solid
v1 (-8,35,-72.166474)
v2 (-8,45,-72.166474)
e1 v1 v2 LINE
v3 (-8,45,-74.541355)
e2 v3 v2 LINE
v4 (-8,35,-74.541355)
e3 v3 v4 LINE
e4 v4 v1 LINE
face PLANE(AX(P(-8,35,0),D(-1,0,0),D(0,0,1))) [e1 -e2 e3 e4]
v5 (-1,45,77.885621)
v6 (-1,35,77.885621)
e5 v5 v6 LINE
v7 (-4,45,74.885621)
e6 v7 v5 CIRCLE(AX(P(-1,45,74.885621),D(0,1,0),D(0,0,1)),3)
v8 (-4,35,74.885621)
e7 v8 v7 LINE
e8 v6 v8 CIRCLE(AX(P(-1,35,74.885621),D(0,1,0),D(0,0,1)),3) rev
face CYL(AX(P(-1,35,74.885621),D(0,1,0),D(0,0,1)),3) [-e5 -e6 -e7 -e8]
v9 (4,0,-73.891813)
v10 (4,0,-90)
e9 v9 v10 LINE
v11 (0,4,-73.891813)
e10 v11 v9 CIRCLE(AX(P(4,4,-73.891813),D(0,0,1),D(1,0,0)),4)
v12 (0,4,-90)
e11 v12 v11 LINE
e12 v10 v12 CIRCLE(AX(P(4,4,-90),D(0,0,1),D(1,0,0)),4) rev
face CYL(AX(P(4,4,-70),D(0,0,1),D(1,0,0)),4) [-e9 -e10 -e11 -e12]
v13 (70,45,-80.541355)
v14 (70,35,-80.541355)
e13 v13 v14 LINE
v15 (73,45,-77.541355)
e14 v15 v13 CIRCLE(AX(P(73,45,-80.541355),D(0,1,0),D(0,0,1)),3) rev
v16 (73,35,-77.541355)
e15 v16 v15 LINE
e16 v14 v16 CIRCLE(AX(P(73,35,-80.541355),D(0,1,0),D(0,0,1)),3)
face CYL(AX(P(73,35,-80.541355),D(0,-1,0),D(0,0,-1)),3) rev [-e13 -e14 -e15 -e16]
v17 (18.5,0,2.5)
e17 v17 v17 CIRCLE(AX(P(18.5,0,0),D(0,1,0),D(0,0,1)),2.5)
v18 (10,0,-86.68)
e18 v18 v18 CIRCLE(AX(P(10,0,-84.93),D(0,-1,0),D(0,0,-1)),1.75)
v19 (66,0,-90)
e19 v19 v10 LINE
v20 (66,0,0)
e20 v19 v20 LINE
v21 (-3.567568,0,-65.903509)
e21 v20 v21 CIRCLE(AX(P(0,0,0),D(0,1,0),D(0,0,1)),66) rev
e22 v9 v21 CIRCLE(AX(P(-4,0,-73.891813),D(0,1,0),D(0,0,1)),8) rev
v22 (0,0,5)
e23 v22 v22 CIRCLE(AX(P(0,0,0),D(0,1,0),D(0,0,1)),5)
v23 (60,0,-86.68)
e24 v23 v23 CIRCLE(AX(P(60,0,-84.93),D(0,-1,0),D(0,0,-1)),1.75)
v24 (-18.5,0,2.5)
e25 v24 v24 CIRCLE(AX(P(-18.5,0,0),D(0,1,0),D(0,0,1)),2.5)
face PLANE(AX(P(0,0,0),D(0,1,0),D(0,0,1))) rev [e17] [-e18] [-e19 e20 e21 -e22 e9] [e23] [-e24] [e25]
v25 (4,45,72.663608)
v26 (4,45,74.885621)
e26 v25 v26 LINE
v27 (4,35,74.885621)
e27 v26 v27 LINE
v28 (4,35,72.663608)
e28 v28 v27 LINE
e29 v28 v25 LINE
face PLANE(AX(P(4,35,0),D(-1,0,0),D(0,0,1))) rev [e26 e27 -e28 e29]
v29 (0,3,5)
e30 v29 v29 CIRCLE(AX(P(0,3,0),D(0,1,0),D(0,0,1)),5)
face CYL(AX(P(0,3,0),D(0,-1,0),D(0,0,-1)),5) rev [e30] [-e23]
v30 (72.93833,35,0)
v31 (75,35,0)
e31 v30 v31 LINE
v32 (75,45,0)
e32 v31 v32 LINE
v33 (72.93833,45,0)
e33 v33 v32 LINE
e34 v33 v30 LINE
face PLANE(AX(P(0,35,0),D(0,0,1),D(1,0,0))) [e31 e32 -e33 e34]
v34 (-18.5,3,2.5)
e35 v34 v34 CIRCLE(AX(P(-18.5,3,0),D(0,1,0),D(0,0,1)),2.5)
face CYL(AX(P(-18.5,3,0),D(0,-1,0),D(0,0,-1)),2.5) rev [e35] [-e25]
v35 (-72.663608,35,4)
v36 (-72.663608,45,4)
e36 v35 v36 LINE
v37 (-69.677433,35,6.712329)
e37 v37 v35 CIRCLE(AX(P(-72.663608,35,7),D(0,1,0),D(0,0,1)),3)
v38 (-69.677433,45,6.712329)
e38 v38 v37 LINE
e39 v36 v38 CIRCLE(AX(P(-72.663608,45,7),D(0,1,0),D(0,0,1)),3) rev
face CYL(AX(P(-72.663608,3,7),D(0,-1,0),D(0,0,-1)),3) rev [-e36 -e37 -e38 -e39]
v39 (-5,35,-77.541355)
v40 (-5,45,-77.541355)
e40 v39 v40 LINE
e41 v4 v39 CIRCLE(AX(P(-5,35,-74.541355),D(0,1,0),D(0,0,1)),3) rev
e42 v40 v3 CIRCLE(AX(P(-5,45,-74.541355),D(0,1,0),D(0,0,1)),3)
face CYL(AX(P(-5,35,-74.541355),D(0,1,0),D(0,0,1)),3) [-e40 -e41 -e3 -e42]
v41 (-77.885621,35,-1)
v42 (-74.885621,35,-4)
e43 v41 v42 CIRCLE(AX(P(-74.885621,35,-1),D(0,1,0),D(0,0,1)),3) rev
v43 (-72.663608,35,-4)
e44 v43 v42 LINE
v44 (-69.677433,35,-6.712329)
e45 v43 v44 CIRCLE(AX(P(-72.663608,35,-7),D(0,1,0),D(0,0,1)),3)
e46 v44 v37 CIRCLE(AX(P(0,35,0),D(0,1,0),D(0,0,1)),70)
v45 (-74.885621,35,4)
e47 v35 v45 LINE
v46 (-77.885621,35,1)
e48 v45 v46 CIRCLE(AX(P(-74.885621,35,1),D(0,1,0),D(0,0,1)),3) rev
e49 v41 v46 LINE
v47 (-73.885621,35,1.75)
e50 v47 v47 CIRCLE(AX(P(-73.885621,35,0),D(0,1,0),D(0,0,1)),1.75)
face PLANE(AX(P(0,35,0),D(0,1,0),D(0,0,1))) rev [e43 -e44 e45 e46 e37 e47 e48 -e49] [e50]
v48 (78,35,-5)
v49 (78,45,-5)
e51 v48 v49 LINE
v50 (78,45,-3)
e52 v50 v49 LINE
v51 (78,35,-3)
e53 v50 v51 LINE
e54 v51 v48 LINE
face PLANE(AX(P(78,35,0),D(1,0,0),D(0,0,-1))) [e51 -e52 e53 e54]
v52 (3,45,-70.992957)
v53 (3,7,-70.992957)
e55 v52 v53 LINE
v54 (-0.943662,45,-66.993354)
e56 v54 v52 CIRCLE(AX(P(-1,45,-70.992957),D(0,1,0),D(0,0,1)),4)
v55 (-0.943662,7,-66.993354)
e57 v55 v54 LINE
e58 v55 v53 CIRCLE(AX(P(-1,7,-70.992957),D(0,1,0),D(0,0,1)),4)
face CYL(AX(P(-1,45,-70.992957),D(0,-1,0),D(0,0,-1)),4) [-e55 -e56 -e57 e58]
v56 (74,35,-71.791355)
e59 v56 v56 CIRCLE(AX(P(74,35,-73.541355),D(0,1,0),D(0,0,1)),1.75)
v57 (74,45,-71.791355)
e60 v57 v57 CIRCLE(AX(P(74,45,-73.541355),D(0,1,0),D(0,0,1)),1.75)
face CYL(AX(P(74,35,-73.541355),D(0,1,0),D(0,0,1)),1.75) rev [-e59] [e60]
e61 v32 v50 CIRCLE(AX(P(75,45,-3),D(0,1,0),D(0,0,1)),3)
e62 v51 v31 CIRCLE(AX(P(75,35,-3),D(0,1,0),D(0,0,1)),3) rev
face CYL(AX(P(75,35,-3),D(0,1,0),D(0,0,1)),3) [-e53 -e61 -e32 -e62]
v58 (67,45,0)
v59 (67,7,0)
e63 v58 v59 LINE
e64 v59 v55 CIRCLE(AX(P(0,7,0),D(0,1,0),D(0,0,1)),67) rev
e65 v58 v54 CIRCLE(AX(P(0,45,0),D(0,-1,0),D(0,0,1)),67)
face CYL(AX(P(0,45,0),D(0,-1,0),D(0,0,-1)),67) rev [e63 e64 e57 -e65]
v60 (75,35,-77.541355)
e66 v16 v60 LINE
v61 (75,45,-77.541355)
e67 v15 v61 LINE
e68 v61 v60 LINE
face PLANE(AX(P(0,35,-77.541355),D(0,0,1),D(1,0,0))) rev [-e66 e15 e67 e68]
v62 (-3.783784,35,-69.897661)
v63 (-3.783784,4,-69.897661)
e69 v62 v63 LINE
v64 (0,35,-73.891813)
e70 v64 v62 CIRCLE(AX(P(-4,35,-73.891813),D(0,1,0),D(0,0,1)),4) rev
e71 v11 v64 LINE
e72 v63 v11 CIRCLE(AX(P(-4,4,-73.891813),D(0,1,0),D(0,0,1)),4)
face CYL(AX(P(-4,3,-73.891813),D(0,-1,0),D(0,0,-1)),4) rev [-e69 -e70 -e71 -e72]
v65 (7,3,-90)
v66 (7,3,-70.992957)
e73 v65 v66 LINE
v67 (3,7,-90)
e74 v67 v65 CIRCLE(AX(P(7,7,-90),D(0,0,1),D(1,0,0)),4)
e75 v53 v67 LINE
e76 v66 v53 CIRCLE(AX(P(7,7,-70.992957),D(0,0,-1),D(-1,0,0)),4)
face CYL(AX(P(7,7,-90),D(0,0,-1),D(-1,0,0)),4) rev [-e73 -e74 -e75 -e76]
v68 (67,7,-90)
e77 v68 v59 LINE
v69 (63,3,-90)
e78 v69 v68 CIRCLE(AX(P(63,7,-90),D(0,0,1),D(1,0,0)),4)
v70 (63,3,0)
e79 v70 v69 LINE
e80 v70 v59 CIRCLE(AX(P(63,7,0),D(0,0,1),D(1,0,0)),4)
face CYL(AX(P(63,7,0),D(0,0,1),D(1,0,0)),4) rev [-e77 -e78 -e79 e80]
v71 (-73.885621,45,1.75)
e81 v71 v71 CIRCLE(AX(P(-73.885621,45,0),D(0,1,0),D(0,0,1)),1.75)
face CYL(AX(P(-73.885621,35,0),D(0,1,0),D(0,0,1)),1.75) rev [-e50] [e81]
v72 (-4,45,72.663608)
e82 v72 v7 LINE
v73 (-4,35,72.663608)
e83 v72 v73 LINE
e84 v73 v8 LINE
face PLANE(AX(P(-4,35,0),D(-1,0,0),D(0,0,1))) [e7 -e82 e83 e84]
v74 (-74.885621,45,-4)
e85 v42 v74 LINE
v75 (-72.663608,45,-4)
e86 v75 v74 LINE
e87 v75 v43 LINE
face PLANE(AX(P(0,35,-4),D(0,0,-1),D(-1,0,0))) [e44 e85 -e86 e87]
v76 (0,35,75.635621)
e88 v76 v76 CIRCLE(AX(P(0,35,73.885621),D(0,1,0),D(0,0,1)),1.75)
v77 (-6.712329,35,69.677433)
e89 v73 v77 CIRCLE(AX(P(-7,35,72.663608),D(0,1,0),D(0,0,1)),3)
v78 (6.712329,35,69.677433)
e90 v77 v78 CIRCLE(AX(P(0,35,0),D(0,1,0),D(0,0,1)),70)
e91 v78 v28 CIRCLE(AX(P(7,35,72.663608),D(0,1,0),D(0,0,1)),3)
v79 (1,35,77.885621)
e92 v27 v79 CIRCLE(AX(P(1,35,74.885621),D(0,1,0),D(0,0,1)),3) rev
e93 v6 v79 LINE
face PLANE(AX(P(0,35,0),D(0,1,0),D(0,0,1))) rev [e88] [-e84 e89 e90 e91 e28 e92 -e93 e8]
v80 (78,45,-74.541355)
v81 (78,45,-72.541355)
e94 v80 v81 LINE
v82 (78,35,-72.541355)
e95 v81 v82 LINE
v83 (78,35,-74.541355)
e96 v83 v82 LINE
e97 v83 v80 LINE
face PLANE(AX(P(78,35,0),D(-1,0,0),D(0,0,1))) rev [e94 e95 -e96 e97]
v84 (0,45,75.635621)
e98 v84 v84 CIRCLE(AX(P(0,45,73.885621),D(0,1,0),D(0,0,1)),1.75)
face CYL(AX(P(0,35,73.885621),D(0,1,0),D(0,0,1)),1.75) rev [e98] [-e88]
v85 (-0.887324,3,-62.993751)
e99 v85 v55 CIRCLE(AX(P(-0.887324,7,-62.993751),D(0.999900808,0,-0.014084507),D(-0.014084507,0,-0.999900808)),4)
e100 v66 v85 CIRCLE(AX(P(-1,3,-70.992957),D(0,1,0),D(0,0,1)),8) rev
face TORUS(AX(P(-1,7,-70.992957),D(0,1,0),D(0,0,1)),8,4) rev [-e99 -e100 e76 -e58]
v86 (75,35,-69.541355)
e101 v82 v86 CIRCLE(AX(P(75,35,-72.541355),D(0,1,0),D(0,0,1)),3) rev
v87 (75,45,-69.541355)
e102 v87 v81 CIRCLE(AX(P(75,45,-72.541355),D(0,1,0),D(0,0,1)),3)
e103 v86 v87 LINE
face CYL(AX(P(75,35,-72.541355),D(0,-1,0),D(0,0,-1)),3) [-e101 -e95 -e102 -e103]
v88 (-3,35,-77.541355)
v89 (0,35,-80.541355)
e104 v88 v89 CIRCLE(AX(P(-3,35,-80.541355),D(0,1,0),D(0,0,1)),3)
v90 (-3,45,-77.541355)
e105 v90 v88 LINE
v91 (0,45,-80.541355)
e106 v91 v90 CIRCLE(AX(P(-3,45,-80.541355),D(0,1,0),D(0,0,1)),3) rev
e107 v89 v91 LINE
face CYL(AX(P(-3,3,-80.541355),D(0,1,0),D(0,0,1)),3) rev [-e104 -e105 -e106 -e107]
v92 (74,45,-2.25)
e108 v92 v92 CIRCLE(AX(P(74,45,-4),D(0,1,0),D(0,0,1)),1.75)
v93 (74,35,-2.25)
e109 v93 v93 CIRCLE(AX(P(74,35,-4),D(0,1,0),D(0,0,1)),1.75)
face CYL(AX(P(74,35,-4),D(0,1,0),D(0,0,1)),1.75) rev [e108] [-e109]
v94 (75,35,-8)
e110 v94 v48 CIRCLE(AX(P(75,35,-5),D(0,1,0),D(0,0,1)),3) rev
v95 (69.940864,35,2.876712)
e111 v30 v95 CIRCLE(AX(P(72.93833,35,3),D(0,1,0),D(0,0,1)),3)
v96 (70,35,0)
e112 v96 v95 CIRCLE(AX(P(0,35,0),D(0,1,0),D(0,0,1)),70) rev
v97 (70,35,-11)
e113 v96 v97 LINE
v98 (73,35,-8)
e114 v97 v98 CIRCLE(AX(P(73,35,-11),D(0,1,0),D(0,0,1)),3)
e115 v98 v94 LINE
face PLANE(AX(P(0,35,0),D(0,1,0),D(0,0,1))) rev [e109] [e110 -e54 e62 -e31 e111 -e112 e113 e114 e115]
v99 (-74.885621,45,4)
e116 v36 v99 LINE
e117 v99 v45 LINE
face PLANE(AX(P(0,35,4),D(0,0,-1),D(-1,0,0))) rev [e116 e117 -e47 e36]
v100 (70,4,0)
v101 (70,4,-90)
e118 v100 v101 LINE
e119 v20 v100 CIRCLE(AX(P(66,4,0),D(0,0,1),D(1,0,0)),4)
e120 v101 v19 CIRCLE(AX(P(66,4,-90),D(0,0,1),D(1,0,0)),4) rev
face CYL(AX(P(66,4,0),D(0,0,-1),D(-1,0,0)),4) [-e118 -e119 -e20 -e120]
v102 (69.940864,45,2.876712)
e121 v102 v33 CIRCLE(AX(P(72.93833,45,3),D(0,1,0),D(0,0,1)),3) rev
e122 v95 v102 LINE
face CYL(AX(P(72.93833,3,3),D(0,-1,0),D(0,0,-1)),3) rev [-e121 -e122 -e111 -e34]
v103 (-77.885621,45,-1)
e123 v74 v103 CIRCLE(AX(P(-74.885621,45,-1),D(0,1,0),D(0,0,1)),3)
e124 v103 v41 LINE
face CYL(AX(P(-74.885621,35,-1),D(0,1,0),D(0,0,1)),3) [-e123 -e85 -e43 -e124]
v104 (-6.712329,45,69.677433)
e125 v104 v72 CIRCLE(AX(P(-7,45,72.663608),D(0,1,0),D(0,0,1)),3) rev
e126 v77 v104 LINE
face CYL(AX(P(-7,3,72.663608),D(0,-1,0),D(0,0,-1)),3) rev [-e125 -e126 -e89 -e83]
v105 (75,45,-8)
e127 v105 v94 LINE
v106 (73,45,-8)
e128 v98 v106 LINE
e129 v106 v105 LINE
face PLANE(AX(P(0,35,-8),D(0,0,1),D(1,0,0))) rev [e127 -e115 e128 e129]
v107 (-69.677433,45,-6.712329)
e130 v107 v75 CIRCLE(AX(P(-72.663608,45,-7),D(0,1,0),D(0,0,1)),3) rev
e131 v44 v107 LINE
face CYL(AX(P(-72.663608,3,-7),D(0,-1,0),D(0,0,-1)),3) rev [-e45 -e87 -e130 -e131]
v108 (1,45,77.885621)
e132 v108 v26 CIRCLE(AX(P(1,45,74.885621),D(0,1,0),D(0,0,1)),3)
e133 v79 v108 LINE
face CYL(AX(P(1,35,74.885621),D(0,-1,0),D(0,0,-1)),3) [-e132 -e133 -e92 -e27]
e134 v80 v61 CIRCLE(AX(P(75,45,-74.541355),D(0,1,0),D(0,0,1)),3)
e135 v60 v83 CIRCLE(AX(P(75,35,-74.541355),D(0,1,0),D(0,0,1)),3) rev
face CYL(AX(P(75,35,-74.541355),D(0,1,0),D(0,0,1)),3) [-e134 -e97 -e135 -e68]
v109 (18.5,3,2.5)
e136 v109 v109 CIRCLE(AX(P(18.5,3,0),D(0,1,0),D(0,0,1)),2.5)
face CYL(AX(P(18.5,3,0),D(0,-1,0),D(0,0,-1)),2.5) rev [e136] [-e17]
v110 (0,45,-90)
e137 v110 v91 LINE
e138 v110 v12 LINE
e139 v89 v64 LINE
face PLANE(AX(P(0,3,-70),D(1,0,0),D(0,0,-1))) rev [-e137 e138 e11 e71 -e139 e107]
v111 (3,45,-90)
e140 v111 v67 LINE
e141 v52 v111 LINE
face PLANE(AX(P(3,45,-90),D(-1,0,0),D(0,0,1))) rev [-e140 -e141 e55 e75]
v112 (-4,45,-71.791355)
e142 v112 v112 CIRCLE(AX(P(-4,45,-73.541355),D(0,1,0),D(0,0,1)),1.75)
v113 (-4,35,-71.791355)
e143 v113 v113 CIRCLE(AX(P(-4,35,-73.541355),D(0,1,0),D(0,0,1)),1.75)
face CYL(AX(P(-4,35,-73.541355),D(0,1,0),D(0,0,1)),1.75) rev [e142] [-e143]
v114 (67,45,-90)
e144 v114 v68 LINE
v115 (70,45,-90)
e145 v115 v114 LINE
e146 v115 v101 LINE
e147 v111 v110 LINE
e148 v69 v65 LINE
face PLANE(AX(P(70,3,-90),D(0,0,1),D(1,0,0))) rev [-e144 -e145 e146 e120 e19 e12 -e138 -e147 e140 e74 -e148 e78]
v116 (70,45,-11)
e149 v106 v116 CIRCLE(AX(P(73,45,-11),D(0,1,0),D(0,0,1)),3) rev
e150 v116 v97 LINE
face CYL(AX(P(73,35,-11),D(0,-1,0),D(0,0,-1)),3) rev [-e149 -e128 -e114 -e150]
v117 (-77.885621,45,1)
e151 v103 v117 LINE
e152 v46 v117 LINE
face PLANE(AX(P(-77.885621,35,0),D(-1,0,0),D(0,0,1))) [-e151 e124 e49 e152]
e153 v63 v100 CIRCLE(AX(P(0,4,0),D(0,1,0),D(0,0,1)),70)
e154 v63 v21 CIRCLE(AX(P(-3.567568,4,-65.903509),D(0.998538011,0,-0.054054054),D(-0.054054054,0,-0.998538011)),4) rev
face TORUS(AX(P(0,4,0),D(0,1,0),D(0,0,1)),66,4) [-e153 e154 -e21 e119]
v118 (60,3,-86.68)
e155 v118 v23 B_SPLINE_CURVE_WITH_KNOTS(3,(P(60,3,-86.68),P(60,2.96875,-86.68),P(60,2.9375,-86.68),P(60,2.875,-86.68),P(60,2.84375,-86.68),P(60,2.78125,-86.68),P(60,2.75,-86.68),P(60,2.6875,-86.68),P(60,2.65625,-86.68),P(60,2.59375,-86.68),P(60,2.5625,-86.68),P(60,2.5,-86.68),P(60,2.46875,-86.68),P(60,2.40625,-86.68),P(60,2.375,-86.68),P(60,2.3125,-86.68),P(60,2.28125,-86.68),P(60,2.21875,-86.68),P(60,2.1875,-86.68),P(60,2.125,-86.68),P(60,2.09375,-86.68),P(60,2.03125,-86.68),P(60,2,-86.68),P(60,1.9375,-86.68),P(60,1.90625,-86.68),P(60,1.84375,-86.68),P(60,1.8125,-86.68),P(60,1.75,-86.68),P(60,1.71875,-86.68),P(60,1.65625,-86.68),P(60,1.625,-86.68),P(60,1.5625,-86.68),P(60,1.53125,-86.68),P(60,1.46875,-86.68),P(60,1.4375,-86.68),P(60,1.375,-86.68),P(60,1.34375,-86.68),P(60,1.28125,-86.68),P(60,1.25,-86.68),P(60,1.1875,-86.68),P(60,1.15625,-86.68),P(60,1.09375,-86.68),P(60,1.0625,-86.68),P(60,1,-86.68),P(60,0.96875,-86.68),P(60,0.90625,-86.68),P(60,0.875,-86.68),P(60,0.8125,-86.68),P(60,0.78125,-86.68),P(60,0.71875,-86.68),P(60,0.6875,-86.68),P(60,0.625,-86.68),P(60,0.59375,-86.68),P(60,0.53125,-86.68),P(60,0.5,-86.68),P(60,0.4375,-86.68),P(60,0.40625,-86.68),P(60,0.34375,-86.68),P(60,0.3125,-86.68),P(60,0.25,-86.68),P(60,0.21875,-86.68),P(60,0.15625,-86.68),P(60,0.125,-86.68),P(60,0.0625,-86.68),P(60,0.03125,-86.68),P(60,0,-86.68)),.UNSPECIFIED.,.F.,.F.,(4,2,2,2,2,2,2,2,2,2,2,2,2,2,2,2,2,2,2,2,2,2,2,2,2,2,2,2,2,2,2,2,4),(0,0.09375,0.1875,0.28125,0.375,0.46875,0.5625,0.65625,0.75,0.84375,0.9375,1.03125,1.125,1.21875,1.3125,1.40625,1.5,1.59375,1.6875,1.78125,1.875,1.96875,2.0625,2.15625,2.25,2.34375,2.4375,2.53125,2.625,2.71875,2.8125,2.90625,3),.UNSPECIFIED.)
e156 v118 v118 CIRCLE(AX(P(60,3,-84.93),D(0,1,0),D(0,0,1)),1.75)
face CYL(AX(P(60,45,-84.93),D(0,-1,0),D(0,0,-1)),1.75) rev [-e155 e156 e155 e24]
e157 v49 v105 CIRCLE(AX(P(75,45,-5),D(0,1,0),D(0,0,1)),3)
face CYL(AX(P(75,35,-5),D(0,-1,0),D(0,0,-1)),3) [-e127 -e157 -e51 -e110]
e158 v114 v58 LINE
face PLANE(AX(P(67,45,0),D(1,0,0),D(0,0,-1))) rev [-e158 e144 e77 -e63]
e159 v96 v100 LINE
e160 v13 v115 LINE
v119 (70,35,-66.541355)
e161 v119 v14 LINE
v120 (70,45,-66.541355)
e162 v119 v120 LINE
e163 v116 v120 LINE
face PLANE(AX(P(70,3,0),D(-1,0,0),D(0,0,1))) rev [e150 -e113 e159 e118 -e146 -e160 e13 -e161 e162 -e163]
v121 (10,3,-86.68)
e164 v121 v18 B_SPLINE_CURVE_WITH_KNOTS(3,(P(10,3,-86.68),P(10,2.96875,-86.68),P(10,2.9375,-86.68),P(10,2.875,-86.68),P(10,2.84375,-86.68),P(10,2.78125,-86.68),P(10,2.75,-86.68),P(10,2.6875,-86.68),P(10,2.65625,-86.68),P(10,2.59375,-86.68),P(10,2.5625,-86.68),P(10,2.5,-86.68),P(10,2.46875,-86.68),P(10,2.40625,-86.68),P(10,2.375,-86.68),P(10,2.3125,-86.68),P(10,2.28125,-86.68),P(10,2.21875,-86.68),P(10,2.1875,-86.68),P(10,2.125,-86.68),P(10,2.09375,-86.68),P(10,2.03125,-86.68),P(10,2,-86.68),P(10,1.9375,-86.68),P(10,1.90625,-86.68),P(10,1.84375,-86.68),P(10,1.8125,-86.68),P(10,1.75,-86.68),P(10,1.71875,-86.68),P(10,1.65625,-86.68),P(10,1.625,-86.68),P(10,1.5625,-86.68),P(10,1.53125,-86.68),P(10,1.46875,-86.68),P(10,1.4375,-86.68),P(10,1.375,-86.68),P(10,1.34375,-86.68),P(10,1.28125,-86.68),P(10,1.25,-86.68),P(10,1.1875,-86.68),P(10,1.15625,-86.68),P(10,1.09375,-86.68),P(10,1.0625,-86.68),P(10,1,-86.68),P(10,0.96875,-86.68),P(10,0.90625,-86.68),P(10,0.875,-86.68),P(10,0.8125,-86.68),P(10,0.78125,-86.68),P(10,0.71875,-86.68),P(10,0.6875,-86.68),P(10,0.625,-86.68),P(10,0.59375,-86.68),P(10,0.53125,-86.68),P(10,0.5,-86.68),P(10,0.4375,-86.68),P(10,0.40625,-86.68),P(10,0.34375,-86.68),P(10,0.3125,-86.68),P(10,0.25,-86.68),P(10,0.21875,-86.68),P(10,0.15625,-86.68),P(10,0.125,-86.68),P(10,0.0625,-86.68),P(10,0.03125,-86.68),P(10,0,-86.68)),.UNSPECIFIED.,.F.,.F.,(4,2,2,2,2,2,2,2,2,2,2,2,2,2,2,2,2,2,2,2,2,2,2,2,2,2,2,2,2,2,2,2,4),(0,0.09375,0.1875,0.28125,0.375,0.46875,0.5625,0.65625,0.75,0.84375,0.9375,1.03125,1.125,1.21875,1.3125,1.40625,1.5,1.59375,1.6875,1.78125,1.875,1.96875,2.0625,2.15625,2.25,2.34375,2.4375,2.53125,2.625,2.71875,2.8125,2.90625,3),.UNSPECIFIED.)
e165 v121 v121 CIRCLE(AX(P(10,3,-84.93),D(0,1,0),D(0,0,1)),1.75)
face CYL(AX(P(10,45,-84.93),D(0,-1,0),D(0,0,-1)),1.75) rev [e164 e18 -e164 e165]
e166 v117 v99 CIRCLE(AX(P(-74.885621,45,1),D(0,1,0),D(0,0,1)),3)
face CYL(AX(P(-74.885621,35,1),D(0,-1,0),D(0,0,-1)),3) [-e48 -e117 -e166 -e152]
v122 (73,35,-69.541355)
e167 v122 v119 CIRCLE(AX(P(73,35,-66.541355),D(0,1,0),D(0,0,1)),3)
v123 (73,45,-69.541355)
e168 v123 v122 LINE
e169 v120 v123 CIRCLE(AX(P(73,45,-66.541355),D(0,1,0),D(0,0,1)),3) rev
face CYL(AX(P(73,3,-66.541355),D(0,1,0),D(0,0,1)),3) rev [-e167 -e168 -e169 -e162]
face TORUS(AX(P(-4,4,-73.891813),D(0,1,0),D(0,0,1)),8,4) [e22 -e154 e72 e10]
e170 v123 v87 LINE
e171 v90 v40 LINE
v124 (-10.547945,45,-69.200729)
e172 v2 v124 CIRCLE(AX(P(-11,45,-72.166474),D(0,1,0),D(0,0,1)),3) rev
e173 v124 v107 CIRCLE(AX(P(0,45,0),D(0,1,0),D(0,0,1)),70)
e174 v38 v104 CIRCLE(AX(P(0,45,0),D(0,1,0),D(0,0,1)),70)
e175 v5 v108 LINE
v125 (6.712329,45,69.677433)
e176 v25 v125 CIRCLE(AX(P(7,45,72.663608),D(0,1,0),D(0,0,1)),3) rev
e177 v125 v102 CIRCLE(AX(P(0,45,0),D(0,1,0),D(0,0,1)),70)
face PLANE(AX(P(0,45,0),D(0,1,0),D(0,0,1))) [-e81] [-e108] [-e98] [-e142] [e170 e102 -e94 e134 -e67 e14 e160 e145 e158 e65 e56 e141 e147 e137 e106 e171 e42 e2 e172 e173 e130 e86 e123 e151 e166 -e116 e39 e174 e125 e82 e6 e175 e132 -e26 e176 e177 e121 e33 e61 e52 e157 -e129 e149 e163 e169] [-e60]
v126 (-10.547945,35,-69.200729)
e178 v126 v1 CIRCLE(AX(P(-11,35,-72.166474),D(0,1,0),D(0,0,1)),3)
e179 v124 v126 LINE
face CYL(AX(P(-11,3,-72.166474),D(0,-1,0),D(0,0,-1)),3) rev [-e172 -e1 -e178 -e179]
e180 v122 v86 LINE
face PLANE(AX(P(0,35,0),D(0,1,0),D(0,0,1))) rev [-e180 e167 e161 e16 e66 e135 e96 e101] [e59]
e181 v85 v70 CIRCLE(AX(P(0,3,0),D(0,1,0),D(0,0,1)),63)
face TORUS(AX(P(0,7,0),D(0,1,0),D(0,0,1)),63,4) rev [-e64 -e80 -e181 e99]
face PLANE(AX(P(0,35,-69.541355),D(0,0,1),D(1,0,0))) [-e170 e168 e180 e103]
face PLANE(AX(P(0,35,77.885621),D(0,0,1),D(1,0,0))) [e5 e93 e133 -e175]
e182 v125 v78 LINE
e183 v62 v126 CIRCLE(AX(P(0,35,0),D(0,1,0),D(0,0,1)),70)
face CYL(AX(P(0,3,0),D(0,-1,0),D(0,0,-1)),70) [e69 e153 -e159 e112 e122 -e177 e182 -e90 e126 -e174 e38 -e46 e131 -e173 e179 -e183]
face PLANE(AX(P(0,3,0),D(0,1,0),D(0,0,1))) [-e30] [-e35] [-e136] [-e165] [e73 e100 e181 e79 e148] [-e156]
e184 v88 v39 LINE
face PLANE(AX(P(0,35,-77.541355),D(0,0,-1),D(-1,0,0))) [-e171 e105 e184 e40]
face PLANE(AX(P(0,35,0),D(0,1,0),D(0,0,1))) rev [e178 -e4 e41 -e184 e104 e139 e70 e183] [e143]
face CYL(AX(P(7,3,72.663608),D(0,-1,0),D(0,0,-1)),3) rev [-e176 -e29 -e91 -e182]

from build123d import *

# Parameters (mm, degrees)
SKETCH2_R           = 2.4999999999999982
SKETCH2_R_2         = 4.999999999999999
BOSS_EXTRUDE1_DEPTH = 3
BOSS_EXTRUDE2_DEPTH = 42
BOSS_EXTRUDE3_START = -10
SKETCH4_R           = 1.7500000000000016
SKETCH4_R_2         = 1.749999999999997
SKETCH4_R_3         = 1.7500000000000113
SKETCH4_W           = 8.000000000000014
SKETCH4_H           = 8
SKETCH4_R_4         = 1.7500000000000013
BOSS_EXTRUDE3_DEPTH = 10
FILLET1_R           = 3
FILLET2_R           = 4
FILLET3_R           = 4
FILLET4_R           = 4
SKETCH5_R           = 1.7500000000000004
SKETCH5_R_2         = 1.7500000000000038
CUT_EXTRUDE1_DEPTH  = 128.31457114957425


with BuildPart() as part:
    # Sketch2 → Boss-Extrude1 (new body)
    with BuildSketch(Plane(origin=(0, 0, 0), x_dir=(1, 0, 0), z_dir=(0, 1, 0))):
        with BuildLine():
            Line((70, 0), (70, 90.00000000000003))
            Line((70, 90.00000000000003), (0, 90.00000000000003))
            Line((0, 90.00000000000003), (0, 70))
            ThreePointArc((0, 70), (-49.497474683058336, -49.49747468305832), (70, 0))
        make_face()
        with Locations(Location((18.5, 0, 0), (0, 0, 270))):
            Circle(SKETCH2_R, mode=Mode.SUBTRACT)
        with Locations(Location((-18.5, 0, 0), (0, 0, 270))):
            Circle(SKETCH2_R, mode=Mode.SUBTRACT)
        with Locations(Location((0, 0, 0), (0, 0, 270))):
            Circle(SKETCH2_R_2, mode=Mode.SUBTRACT)
    extrude(amount=BOSS_EXTRUDE1_DEPTH)

    # Sketch3 → Boss-Extrude2 (add)
    with BuildSketch(Plane(origin=(0, 3, 0), x_dir=(1, 0, 0), z_dir=(0, 1, 0))):
        with BuildLine():
            Line((0, 90.00000000000003), (3.0000000000000027, 90.00000000000003))
            Line((3.0000000000000027, 90.00000000000003), (3, 66.93280212272603))
            ThreePointArc((3, 66.93280212272603), (-48.425200051213004, -46.30334761116088), (67, 8.21e-15))
            Line((67, 8.21e-15), (67, 90.00000000000003))
            Line((67, 90.00000000000003), (70, 90.00000000000003))
            Line((70, 90.00000000000003), (70, 0))
            ThreePointArc((70, 0), (-49.497474683058336, -49.49747468305832), (4.29e-15, 70))
            Line((4.29e-15, 70), (0, 90.00000000000003))
        make_face()
    extrude(amount=BOSS_EXTRUDE2_DEPTH)

    # Sketch4 → Boss-Extrude3 (add)
    # profile 1 of 5: a face of its own
    with BuildSketch(Plane(origin=(0, 45.00000000000001, 0), x_dir=(1, 0, 0), z_dir=(0, 1, 0)).offset(BOSS_EXTRUDE3_START)):
        with BuildLine():
            ThreePointArc((4.000000000000007, -69.88562083862459), (-1.996e-14, -70), (-4.000000000000016, -69.88562083862459))
            Line((-4, -69.88562083862459), (-4, -77.8856208386246))
            Line((-4, -77.8856208386246), (4, -77.8856208386246))
            Line((4, -77.8856208386246), (4, -69.88562083862459))
        make_face()
        with Locations(Location((-1.35e-15, -73.8856208386246, 0), (0, 0, 270))):
            Circle(SKETCH4_R, mode=Mode.SUBTRACT)
    # profile 2 of 5: a face of its own
    with BuildSketch(Plane(origin=(0, 45.00000000000001, 0), x_dir=(1, 0, 0), z_dir=(0, 1, 0)).offset(BOSS_EXTRUDE3_START)):
        with BuildLine():
            ThreePointArc((-69.88562083862459, -3.999999999999999), (-70, -3.42e-15), (-69.88562083862459, 3.999999999999993))
            Line((-69.88562083862459, 3.9999999999999973), (-77.88562083862459, 3.9999999999999964))
            Line((-77.88562083862459, 3.9999999999999964), (-77.8856208386246, -3.9999999999999964))
            Line((-77.8856208386246, -3.9999999999999964), (-69.88562083862459, -3.9999999999999973))
        make_face()
        with Locations(Location((-73.8856208386246, 0, 0), (0, 0, 270))):
            Circle(SKETCH4_R_2, mode=Mode.SUBTRACT)
    # profile 3 of 5: a face of its own
    with BuildSketch(Plane(origin=(0, 45.00000000000001, 0), x_dir=(1, 0, 0), z_dir=(0, 1, 0)).offset(BOSS_EXTRUDE3_START)):
        Polygon((70, 8.000000000000007), (70, 0), (78.00000000000001, 0), (78.00000000000001, 8.000000000000009), align=None)
        with Locations(Location((74.00000000000001, 4.0000000000000036, 0), (0, 0, 270))):
            Circle(SKETCH4_R_3, mode=Mode.SUBTRACT)
    # profile 4 of 5: a face of its own
    with BuildSketch(Plane(origin=(0, 45.00000000000001, 0), x_dir=(1, 0, 0), z_dir=(0, 1, 0)).offset(BOSS_EXTRUDE3_START)):
        with Locations((74, 73.54135460285487)):
            Rectangle(SKETCH4_W, SKETCH4_H)
        with Locations(Location((74.00000000000001, 73.54135460285487, 0), (0, 0, 270))):
            Circle(SKETCH4_R_2, mode=Mode.SUBTRACT)
    # profile 5 of 5: a face of its own
    with BuildSketch(Plane(origin=(0, 45.00000000000001, 0), x_dir=(1, 0, 0), z_dir=(0, 1, 0)).offset(BOSS_EXTRUDE3_START)):
        with BuildLine():
            Line((4.29e-15, 70), (0, 77.54135460285485))
            Line((0, 77.54135460285485), (-8, 77.54135460285485))
            Line((-8, 77.54135460285485), (-8, 69.54135460285485))
            ThreePointArc((-7.999999999999997, 69.54135460285484), (-4.00656821982112, 69.88524458782354), (4.29e-15, 70))
        make_face()
        with Locations(Location((-3.9999999999999956, 73.54135460285485, 0), (0, 0, 270))):
            Circle(SKETCH4_R_4, mode=Mode.SUBTRACT)
    extrude(amount=BOSS_EXTRUDE3_DEPTH)

    # Fillet1
    # the kernel refuses this fillet: 3 mm, written as the material it adds along each edge
    with BuildSketch(Plane(origin=(0, 35.00000000000001, -77.54135460285485), x_dir=(7.4e-16, 0, -1), z_dir=(0, 1, 0))) as fillet1_piece_1:
        with BuildLine():
            CenterArc((FILLET1_R, FILLET1_R), FILLET1_R, 180, 90.00000000000006)
            Line((-2.22e-15, FILLET1_R), (0, 0))
            Line((0, 0), (FILLET1_R, 0))
        make_face()
    extrude(amount=10)
    with BuildSketch(Plane(origin=(-7.999999999999998, 35.00000000000001, -69.54135460285484), x_dir=(-6.8e-16, 0, -1), z_dir=(0, 1, 0))) as fillet1_piece_2:
        with BuildLine():
            CenterArc((2.625119607821278, 3), FILLET1_R, 188.66662141673424, 81.3333785832657)
            ThreePointArc((-0.3406259076859169, 2.547945205479499), (-0.15861593060733895, 1.2755363369787691), (0, 0))
            Line((0, 0), (2.6251196078212757, 0))
        make_face()
    extrude(amount=10)
    with BuildSketch(Plane(origin=(4.0000000000000036, 35.00000000000001, 69.88562083862459), x_dir=(-1.28e-15, 0, 1), z_dir=(0, 1, 0))) as fillet1_piece_3:
        with BuildLine():
            CenterArc((2.7779876597158153, 3), FILLET1_R, 185.5025705800243, 84.49742941997579)
            ThreePointArc((-0.20818803199677297, 2.7123287671232883), (-0.09091711741021587, 1.3571757921409222), (0, 0))
            Line((0, 0), (2.7779876597158193, 0))
        make_face()
    extrude(amount=10)
    with BuildSketch(Plane(origin=(-4.000000000000009, 35.00000000000001, 69.88562083862459), x_dir=(3.2e-15, 0, 1), z_dir=(0, 1, 0))) as fillet1_piece_4:
        with BuildLine():
            CenterArc((2.7779876597149995, -3), FILLET1_R, 89.99999999999982, 84.49742941997455)
            ThreePointArc((-0.20818803199758817, -2.7123287671232172), (-0.09091711741020427, -1.3571757921409284), (0, 0))
            Line((0, 0), (2.7779876597150093, 0))
        make_face()
    extrude(amount=10)
    with BuildSketch(Plane(origin=(-69.88562083862459, 35.00000000000001, -3.9999999999999956), x_dir=(-1, 0, -3.2e-16), z_dir=(0, 1, 0))) as fillet1_piece_5:
        with BuildLine():
            CenterArc((2.7779876597150244, -3), FILLET1_R, 90.00000000000003, 84.49742941997454)
            ThreePointArc((-0.20818803199756444, -2.7123287671232275), (-0.09091711741017107, -1.357175792140909), (0, 0))
            Line((0, 0), (2.7779876597150235, 0))
        make_face()
    extrude(amount=10)
    with BuildSketch(Plane(origin=(-69.88562083862459, 35.00000000000001, 3.9999999999999982), x_dir=(-1, 0, -6.4e-16), z_dir=(0, 1, 0))) as fillet1_piece_6:
        with BuildLine():
            CenterArc((2.7779876597158317, 3), FILLET1_R, 185.50257058002416, 84.4974294199759)
            ThreePointArc((-0.208188031996757, 2.712328767123294), (-0.09091711741018658, 1.3571757921409286), (0, 0))
            Line((0, 0), (2.7779876597158335, 0))
        make_face()
    extrude(amount=10)
    with BuildSketch(Plane(origin=(70, 35.00000000000001, -8.000000000000007), x_dir=(0, 0, -1), z_dir=(0, 1, 0))) as fillet1_piece_7:
        with BuildLine():
            CenterArc((FILLET1_R, -FILLET1_R), FILLET1_R, 90, 90)
            Line((0, -FILLET1_R), (0, 0))
            Line((0, 0), (FILLET1_R, 0))
        make_face()
    extrude(amount=10)
    with BuildSketch(Plane(origin=(70, 35.00000000000001, 0), x_dir=(1, 0, 0), z_dir=(0, 1, 0))) as fillet1_piece_8:
        with BuildLine():
            CenterArc((2.9383301152417545, -3), FILLET1_R, 90, 87.64471564422539)
            ThreePointArc((-0.05913550593257355, -2.8767123287671126), (-0.0147854379772383, -1.4386600389375006), (0, 0))
            Line((0, 0), (2.9383301152417545, 0))
        make_face()
    extrude(amount=9.999999999999993)
    with BuildSketch(Plane(origin=(70, 35.00000000000001, -69.54135460285487), x_dir=(0, 0, 1), z_dir=(0, 1, 0))) as fillet1_piece_9:
        with BuildLine():
            CenterArc((FILLET1_R, FILLET1_R), FILLET1_R, 180, 90)
            Line((0, FILLET1_R), (0, 0))
            Line((0, 0), (FILLET1_R, 0))
        make_face()
    extrude(amount=10)
    with BuildSketch(Plane(origin=(70, 35.00000000000001, -77.54135460285487), x_dir=(0, 0, -1), z_dir=(0, 1, 0))) as fillet1_piece_10:
        with BuildLine():
            CenterArc((FILLET1_R, -FILLET1_R), FILLET1_R, 90, 90)
            Line((0, -FILLET1_R), (0, 0))
            Line((0, 0), (FILLET1_R, 0))
        make_face()
    extrude(amount=10)
    # the kernel refuses this fillet: 3 mm, written as the material it takes off along each edge
    with BuildSketch(Plane(origin=(-8, 27.500000000000007, -77.54135460285485), x_dir=(0, 0, 1), z_dir=(0, 1, 0))) as fillet1_2_piece_1:
        with BuildLine():
            CenterArc((FILLET1_R, FILLET1_R), FILLET1_R, 180, 90)
            Line((0, FILLET1_R), (0, 0))
            Line((0, 0), (FILLET1_R, 0))
        make_face()
    extrude(amount=25, mode=Mode.SUBTRACT)
    with BuildSketch(Plane(origin=(4, 27.500000000000007, 77.8856208386246), x_dir=(-1, 0, 0), z_dir=(0, 1, 0))) as fillet1_2_piece_2:
        with BuildLine():
            CenterArc((FILLET1_R, -FILLET1_R), FILLET1_R, 90, 90)
            Line((0, -FILLET1_R), (0, 0))
            Line((0, 0), (FILLET1_R, 0))
        make_face()
    extrude(amount=25, mode=Mode.SUBTRACT)
    with BuildSketch(Plane(origin=(-4, 27.500000000000007, 77.8856208386246), x_dir=(0, 0, -1), z_dir=(0, 1, 0)), Plane(origin=(78.00000000000001, 27.500000000000007, 0), x_dir=(-1, 0, 0), z_dir=(0, 1, 0))) as fillet1_2_piece_3:
        with BuildLine():
            CenterArc((FILLET1_R, -FILLET1_R), FILLET1_R, 90, 90)
            Line((0, -FILLET1_R), (0, 0))
            Line((0, 0), (FILLET1_R, 0))
        make_face()
    extrude(amount=25, mode=Mode.SUBTRACT)
    with BuildSketch(Plane(origin=(-77.88562083862459, 27.500000000000007, -3.9999999999999964), x_dir=(1, 0, -1.5e-16), z_dir=(0, 1, 0))) as fillet1_2_piece_4:
        with BuildLine():
            CenterArc((FILLET1_R, -FILLET1_R), FILLET1_R, 90, 89.99999999999989)
            Line((-4.4e-16, -FILLET1_R), (0, 0))
            Line((0, 0), (FILLET1_R, 0))
        make_face()
    extrude(amount=25, mode=Mode.SUBTRACT)
    with BuildSketch(Plane(origin=(-77.8856208386246, 27.499999999999993, 3.9999999999999964), x_dir=(0, 0, -1), z_dir=(0, 1, 0))) as fillet1_2_piece_5:
        with BuildLine():
            CenterArc((FILLET1_R, -FILLET1_R), FILLET1_R, 89.9999999999999, 90.0000000000001)
            Line((0, -FILLET1_R), (0, 0))
            Line((0, 0), (FILLET1_R, 0))
        make_face()
    extrude(amount=25.00000000000003, mode=Mode.SUBTRACT)
    with BuildSketch(Plane(origin=(78.00000000000001, 27.500000000000007, -8.000000000000009), x_dir=(0, 0, 1), z_dir=(0, 1, 0))) as fillet1_2_piece_6:
        with BuildLine():
            CenterArc((FILLET1_R, -FILLET1_R), FILLET1_R, 90, 90)
            Line((1.78e-15, -FILLET1_R), (0, 0))
            Line((0, 0), (FILLET1_R, 0))
        make_face()
    extrude(amount=25.000000000000007, mode=Mode.SUBTRACT)
    with BuildSketch(Plane(origin=(78.00000000000001, 27.500000000000007, -77.54135460285487), x_dir=(-1, 0, 0), z_dir=(0, 1, 0)), Plane(origin=(78.00000000000001, 27.500000000000007, -69.54135460285487), x_dir=(0, 0, -1), z_dir=(0, 1, 0))) as fillet1_2_piece_7:
        with BuildLine():
            CenterArc((FILLET1_R, FILLET1_R), FILLET1_R, 180, 90)
            Line((0, FILLET1_R), (0, 0))
            Line((0, 0), (FILLET1_R, 0))
        make_face()
    extrude(amount=25, mode=Mode.SUBTRACT)

    # Fillet2
    fillet2_edges = [part.edges().sort_by_distance(p)[0] for p in [
        (3, 24, -66.93280212272603),
    ]]
    fillet(fillet2_edges, radius=FILLET2_R)

    # Fillet3
    fillet3_edges = [part.edges().sort_by_distance(p)[0] for p in [
        (67, 3, -45.000000000000014),
        (-47.04133633246041, 3, 47.70862265939291),
        (3.0000000000000018, 3, -80.4964786985977),
        (1.8482759796652433, 3, -68.18451940719774),
    ]]
    fillet(fillet3_edges, radius=FILLET3_R)

    # Fillet4
    fillet4_edges = [part.edges().sort_by_distance(p)[0] for p in [
        (0, 0, -80.00000000000001),
        (70, 0, -45.000000000000014),
        (-49.49747468305836, 0, 49.4974746830583),
        (-2.95e-15, 19.000000000000004, -70),
    ]]
    fillet(fillet4_edges, radius=FILLET4_R)

    # Sketch5 → Cut-Extrude1 (cut, through all)
    with BuildSketch(Plane.XZ):
        with Locations(Location((10, -84.93000000000002, 0), (0, 0, 270))):
            Circle(SKETCH5_R)
        with Locations(Location((60.00000000000001, -84.93000000000002, 0), (0, 0, 270))):
            Circle(SKETCH5_R_2)
    extrude(amount=-CUT_EXTRUDE1_DEPTH, mode=Mode.SUBTRACT)


solid = part.part
